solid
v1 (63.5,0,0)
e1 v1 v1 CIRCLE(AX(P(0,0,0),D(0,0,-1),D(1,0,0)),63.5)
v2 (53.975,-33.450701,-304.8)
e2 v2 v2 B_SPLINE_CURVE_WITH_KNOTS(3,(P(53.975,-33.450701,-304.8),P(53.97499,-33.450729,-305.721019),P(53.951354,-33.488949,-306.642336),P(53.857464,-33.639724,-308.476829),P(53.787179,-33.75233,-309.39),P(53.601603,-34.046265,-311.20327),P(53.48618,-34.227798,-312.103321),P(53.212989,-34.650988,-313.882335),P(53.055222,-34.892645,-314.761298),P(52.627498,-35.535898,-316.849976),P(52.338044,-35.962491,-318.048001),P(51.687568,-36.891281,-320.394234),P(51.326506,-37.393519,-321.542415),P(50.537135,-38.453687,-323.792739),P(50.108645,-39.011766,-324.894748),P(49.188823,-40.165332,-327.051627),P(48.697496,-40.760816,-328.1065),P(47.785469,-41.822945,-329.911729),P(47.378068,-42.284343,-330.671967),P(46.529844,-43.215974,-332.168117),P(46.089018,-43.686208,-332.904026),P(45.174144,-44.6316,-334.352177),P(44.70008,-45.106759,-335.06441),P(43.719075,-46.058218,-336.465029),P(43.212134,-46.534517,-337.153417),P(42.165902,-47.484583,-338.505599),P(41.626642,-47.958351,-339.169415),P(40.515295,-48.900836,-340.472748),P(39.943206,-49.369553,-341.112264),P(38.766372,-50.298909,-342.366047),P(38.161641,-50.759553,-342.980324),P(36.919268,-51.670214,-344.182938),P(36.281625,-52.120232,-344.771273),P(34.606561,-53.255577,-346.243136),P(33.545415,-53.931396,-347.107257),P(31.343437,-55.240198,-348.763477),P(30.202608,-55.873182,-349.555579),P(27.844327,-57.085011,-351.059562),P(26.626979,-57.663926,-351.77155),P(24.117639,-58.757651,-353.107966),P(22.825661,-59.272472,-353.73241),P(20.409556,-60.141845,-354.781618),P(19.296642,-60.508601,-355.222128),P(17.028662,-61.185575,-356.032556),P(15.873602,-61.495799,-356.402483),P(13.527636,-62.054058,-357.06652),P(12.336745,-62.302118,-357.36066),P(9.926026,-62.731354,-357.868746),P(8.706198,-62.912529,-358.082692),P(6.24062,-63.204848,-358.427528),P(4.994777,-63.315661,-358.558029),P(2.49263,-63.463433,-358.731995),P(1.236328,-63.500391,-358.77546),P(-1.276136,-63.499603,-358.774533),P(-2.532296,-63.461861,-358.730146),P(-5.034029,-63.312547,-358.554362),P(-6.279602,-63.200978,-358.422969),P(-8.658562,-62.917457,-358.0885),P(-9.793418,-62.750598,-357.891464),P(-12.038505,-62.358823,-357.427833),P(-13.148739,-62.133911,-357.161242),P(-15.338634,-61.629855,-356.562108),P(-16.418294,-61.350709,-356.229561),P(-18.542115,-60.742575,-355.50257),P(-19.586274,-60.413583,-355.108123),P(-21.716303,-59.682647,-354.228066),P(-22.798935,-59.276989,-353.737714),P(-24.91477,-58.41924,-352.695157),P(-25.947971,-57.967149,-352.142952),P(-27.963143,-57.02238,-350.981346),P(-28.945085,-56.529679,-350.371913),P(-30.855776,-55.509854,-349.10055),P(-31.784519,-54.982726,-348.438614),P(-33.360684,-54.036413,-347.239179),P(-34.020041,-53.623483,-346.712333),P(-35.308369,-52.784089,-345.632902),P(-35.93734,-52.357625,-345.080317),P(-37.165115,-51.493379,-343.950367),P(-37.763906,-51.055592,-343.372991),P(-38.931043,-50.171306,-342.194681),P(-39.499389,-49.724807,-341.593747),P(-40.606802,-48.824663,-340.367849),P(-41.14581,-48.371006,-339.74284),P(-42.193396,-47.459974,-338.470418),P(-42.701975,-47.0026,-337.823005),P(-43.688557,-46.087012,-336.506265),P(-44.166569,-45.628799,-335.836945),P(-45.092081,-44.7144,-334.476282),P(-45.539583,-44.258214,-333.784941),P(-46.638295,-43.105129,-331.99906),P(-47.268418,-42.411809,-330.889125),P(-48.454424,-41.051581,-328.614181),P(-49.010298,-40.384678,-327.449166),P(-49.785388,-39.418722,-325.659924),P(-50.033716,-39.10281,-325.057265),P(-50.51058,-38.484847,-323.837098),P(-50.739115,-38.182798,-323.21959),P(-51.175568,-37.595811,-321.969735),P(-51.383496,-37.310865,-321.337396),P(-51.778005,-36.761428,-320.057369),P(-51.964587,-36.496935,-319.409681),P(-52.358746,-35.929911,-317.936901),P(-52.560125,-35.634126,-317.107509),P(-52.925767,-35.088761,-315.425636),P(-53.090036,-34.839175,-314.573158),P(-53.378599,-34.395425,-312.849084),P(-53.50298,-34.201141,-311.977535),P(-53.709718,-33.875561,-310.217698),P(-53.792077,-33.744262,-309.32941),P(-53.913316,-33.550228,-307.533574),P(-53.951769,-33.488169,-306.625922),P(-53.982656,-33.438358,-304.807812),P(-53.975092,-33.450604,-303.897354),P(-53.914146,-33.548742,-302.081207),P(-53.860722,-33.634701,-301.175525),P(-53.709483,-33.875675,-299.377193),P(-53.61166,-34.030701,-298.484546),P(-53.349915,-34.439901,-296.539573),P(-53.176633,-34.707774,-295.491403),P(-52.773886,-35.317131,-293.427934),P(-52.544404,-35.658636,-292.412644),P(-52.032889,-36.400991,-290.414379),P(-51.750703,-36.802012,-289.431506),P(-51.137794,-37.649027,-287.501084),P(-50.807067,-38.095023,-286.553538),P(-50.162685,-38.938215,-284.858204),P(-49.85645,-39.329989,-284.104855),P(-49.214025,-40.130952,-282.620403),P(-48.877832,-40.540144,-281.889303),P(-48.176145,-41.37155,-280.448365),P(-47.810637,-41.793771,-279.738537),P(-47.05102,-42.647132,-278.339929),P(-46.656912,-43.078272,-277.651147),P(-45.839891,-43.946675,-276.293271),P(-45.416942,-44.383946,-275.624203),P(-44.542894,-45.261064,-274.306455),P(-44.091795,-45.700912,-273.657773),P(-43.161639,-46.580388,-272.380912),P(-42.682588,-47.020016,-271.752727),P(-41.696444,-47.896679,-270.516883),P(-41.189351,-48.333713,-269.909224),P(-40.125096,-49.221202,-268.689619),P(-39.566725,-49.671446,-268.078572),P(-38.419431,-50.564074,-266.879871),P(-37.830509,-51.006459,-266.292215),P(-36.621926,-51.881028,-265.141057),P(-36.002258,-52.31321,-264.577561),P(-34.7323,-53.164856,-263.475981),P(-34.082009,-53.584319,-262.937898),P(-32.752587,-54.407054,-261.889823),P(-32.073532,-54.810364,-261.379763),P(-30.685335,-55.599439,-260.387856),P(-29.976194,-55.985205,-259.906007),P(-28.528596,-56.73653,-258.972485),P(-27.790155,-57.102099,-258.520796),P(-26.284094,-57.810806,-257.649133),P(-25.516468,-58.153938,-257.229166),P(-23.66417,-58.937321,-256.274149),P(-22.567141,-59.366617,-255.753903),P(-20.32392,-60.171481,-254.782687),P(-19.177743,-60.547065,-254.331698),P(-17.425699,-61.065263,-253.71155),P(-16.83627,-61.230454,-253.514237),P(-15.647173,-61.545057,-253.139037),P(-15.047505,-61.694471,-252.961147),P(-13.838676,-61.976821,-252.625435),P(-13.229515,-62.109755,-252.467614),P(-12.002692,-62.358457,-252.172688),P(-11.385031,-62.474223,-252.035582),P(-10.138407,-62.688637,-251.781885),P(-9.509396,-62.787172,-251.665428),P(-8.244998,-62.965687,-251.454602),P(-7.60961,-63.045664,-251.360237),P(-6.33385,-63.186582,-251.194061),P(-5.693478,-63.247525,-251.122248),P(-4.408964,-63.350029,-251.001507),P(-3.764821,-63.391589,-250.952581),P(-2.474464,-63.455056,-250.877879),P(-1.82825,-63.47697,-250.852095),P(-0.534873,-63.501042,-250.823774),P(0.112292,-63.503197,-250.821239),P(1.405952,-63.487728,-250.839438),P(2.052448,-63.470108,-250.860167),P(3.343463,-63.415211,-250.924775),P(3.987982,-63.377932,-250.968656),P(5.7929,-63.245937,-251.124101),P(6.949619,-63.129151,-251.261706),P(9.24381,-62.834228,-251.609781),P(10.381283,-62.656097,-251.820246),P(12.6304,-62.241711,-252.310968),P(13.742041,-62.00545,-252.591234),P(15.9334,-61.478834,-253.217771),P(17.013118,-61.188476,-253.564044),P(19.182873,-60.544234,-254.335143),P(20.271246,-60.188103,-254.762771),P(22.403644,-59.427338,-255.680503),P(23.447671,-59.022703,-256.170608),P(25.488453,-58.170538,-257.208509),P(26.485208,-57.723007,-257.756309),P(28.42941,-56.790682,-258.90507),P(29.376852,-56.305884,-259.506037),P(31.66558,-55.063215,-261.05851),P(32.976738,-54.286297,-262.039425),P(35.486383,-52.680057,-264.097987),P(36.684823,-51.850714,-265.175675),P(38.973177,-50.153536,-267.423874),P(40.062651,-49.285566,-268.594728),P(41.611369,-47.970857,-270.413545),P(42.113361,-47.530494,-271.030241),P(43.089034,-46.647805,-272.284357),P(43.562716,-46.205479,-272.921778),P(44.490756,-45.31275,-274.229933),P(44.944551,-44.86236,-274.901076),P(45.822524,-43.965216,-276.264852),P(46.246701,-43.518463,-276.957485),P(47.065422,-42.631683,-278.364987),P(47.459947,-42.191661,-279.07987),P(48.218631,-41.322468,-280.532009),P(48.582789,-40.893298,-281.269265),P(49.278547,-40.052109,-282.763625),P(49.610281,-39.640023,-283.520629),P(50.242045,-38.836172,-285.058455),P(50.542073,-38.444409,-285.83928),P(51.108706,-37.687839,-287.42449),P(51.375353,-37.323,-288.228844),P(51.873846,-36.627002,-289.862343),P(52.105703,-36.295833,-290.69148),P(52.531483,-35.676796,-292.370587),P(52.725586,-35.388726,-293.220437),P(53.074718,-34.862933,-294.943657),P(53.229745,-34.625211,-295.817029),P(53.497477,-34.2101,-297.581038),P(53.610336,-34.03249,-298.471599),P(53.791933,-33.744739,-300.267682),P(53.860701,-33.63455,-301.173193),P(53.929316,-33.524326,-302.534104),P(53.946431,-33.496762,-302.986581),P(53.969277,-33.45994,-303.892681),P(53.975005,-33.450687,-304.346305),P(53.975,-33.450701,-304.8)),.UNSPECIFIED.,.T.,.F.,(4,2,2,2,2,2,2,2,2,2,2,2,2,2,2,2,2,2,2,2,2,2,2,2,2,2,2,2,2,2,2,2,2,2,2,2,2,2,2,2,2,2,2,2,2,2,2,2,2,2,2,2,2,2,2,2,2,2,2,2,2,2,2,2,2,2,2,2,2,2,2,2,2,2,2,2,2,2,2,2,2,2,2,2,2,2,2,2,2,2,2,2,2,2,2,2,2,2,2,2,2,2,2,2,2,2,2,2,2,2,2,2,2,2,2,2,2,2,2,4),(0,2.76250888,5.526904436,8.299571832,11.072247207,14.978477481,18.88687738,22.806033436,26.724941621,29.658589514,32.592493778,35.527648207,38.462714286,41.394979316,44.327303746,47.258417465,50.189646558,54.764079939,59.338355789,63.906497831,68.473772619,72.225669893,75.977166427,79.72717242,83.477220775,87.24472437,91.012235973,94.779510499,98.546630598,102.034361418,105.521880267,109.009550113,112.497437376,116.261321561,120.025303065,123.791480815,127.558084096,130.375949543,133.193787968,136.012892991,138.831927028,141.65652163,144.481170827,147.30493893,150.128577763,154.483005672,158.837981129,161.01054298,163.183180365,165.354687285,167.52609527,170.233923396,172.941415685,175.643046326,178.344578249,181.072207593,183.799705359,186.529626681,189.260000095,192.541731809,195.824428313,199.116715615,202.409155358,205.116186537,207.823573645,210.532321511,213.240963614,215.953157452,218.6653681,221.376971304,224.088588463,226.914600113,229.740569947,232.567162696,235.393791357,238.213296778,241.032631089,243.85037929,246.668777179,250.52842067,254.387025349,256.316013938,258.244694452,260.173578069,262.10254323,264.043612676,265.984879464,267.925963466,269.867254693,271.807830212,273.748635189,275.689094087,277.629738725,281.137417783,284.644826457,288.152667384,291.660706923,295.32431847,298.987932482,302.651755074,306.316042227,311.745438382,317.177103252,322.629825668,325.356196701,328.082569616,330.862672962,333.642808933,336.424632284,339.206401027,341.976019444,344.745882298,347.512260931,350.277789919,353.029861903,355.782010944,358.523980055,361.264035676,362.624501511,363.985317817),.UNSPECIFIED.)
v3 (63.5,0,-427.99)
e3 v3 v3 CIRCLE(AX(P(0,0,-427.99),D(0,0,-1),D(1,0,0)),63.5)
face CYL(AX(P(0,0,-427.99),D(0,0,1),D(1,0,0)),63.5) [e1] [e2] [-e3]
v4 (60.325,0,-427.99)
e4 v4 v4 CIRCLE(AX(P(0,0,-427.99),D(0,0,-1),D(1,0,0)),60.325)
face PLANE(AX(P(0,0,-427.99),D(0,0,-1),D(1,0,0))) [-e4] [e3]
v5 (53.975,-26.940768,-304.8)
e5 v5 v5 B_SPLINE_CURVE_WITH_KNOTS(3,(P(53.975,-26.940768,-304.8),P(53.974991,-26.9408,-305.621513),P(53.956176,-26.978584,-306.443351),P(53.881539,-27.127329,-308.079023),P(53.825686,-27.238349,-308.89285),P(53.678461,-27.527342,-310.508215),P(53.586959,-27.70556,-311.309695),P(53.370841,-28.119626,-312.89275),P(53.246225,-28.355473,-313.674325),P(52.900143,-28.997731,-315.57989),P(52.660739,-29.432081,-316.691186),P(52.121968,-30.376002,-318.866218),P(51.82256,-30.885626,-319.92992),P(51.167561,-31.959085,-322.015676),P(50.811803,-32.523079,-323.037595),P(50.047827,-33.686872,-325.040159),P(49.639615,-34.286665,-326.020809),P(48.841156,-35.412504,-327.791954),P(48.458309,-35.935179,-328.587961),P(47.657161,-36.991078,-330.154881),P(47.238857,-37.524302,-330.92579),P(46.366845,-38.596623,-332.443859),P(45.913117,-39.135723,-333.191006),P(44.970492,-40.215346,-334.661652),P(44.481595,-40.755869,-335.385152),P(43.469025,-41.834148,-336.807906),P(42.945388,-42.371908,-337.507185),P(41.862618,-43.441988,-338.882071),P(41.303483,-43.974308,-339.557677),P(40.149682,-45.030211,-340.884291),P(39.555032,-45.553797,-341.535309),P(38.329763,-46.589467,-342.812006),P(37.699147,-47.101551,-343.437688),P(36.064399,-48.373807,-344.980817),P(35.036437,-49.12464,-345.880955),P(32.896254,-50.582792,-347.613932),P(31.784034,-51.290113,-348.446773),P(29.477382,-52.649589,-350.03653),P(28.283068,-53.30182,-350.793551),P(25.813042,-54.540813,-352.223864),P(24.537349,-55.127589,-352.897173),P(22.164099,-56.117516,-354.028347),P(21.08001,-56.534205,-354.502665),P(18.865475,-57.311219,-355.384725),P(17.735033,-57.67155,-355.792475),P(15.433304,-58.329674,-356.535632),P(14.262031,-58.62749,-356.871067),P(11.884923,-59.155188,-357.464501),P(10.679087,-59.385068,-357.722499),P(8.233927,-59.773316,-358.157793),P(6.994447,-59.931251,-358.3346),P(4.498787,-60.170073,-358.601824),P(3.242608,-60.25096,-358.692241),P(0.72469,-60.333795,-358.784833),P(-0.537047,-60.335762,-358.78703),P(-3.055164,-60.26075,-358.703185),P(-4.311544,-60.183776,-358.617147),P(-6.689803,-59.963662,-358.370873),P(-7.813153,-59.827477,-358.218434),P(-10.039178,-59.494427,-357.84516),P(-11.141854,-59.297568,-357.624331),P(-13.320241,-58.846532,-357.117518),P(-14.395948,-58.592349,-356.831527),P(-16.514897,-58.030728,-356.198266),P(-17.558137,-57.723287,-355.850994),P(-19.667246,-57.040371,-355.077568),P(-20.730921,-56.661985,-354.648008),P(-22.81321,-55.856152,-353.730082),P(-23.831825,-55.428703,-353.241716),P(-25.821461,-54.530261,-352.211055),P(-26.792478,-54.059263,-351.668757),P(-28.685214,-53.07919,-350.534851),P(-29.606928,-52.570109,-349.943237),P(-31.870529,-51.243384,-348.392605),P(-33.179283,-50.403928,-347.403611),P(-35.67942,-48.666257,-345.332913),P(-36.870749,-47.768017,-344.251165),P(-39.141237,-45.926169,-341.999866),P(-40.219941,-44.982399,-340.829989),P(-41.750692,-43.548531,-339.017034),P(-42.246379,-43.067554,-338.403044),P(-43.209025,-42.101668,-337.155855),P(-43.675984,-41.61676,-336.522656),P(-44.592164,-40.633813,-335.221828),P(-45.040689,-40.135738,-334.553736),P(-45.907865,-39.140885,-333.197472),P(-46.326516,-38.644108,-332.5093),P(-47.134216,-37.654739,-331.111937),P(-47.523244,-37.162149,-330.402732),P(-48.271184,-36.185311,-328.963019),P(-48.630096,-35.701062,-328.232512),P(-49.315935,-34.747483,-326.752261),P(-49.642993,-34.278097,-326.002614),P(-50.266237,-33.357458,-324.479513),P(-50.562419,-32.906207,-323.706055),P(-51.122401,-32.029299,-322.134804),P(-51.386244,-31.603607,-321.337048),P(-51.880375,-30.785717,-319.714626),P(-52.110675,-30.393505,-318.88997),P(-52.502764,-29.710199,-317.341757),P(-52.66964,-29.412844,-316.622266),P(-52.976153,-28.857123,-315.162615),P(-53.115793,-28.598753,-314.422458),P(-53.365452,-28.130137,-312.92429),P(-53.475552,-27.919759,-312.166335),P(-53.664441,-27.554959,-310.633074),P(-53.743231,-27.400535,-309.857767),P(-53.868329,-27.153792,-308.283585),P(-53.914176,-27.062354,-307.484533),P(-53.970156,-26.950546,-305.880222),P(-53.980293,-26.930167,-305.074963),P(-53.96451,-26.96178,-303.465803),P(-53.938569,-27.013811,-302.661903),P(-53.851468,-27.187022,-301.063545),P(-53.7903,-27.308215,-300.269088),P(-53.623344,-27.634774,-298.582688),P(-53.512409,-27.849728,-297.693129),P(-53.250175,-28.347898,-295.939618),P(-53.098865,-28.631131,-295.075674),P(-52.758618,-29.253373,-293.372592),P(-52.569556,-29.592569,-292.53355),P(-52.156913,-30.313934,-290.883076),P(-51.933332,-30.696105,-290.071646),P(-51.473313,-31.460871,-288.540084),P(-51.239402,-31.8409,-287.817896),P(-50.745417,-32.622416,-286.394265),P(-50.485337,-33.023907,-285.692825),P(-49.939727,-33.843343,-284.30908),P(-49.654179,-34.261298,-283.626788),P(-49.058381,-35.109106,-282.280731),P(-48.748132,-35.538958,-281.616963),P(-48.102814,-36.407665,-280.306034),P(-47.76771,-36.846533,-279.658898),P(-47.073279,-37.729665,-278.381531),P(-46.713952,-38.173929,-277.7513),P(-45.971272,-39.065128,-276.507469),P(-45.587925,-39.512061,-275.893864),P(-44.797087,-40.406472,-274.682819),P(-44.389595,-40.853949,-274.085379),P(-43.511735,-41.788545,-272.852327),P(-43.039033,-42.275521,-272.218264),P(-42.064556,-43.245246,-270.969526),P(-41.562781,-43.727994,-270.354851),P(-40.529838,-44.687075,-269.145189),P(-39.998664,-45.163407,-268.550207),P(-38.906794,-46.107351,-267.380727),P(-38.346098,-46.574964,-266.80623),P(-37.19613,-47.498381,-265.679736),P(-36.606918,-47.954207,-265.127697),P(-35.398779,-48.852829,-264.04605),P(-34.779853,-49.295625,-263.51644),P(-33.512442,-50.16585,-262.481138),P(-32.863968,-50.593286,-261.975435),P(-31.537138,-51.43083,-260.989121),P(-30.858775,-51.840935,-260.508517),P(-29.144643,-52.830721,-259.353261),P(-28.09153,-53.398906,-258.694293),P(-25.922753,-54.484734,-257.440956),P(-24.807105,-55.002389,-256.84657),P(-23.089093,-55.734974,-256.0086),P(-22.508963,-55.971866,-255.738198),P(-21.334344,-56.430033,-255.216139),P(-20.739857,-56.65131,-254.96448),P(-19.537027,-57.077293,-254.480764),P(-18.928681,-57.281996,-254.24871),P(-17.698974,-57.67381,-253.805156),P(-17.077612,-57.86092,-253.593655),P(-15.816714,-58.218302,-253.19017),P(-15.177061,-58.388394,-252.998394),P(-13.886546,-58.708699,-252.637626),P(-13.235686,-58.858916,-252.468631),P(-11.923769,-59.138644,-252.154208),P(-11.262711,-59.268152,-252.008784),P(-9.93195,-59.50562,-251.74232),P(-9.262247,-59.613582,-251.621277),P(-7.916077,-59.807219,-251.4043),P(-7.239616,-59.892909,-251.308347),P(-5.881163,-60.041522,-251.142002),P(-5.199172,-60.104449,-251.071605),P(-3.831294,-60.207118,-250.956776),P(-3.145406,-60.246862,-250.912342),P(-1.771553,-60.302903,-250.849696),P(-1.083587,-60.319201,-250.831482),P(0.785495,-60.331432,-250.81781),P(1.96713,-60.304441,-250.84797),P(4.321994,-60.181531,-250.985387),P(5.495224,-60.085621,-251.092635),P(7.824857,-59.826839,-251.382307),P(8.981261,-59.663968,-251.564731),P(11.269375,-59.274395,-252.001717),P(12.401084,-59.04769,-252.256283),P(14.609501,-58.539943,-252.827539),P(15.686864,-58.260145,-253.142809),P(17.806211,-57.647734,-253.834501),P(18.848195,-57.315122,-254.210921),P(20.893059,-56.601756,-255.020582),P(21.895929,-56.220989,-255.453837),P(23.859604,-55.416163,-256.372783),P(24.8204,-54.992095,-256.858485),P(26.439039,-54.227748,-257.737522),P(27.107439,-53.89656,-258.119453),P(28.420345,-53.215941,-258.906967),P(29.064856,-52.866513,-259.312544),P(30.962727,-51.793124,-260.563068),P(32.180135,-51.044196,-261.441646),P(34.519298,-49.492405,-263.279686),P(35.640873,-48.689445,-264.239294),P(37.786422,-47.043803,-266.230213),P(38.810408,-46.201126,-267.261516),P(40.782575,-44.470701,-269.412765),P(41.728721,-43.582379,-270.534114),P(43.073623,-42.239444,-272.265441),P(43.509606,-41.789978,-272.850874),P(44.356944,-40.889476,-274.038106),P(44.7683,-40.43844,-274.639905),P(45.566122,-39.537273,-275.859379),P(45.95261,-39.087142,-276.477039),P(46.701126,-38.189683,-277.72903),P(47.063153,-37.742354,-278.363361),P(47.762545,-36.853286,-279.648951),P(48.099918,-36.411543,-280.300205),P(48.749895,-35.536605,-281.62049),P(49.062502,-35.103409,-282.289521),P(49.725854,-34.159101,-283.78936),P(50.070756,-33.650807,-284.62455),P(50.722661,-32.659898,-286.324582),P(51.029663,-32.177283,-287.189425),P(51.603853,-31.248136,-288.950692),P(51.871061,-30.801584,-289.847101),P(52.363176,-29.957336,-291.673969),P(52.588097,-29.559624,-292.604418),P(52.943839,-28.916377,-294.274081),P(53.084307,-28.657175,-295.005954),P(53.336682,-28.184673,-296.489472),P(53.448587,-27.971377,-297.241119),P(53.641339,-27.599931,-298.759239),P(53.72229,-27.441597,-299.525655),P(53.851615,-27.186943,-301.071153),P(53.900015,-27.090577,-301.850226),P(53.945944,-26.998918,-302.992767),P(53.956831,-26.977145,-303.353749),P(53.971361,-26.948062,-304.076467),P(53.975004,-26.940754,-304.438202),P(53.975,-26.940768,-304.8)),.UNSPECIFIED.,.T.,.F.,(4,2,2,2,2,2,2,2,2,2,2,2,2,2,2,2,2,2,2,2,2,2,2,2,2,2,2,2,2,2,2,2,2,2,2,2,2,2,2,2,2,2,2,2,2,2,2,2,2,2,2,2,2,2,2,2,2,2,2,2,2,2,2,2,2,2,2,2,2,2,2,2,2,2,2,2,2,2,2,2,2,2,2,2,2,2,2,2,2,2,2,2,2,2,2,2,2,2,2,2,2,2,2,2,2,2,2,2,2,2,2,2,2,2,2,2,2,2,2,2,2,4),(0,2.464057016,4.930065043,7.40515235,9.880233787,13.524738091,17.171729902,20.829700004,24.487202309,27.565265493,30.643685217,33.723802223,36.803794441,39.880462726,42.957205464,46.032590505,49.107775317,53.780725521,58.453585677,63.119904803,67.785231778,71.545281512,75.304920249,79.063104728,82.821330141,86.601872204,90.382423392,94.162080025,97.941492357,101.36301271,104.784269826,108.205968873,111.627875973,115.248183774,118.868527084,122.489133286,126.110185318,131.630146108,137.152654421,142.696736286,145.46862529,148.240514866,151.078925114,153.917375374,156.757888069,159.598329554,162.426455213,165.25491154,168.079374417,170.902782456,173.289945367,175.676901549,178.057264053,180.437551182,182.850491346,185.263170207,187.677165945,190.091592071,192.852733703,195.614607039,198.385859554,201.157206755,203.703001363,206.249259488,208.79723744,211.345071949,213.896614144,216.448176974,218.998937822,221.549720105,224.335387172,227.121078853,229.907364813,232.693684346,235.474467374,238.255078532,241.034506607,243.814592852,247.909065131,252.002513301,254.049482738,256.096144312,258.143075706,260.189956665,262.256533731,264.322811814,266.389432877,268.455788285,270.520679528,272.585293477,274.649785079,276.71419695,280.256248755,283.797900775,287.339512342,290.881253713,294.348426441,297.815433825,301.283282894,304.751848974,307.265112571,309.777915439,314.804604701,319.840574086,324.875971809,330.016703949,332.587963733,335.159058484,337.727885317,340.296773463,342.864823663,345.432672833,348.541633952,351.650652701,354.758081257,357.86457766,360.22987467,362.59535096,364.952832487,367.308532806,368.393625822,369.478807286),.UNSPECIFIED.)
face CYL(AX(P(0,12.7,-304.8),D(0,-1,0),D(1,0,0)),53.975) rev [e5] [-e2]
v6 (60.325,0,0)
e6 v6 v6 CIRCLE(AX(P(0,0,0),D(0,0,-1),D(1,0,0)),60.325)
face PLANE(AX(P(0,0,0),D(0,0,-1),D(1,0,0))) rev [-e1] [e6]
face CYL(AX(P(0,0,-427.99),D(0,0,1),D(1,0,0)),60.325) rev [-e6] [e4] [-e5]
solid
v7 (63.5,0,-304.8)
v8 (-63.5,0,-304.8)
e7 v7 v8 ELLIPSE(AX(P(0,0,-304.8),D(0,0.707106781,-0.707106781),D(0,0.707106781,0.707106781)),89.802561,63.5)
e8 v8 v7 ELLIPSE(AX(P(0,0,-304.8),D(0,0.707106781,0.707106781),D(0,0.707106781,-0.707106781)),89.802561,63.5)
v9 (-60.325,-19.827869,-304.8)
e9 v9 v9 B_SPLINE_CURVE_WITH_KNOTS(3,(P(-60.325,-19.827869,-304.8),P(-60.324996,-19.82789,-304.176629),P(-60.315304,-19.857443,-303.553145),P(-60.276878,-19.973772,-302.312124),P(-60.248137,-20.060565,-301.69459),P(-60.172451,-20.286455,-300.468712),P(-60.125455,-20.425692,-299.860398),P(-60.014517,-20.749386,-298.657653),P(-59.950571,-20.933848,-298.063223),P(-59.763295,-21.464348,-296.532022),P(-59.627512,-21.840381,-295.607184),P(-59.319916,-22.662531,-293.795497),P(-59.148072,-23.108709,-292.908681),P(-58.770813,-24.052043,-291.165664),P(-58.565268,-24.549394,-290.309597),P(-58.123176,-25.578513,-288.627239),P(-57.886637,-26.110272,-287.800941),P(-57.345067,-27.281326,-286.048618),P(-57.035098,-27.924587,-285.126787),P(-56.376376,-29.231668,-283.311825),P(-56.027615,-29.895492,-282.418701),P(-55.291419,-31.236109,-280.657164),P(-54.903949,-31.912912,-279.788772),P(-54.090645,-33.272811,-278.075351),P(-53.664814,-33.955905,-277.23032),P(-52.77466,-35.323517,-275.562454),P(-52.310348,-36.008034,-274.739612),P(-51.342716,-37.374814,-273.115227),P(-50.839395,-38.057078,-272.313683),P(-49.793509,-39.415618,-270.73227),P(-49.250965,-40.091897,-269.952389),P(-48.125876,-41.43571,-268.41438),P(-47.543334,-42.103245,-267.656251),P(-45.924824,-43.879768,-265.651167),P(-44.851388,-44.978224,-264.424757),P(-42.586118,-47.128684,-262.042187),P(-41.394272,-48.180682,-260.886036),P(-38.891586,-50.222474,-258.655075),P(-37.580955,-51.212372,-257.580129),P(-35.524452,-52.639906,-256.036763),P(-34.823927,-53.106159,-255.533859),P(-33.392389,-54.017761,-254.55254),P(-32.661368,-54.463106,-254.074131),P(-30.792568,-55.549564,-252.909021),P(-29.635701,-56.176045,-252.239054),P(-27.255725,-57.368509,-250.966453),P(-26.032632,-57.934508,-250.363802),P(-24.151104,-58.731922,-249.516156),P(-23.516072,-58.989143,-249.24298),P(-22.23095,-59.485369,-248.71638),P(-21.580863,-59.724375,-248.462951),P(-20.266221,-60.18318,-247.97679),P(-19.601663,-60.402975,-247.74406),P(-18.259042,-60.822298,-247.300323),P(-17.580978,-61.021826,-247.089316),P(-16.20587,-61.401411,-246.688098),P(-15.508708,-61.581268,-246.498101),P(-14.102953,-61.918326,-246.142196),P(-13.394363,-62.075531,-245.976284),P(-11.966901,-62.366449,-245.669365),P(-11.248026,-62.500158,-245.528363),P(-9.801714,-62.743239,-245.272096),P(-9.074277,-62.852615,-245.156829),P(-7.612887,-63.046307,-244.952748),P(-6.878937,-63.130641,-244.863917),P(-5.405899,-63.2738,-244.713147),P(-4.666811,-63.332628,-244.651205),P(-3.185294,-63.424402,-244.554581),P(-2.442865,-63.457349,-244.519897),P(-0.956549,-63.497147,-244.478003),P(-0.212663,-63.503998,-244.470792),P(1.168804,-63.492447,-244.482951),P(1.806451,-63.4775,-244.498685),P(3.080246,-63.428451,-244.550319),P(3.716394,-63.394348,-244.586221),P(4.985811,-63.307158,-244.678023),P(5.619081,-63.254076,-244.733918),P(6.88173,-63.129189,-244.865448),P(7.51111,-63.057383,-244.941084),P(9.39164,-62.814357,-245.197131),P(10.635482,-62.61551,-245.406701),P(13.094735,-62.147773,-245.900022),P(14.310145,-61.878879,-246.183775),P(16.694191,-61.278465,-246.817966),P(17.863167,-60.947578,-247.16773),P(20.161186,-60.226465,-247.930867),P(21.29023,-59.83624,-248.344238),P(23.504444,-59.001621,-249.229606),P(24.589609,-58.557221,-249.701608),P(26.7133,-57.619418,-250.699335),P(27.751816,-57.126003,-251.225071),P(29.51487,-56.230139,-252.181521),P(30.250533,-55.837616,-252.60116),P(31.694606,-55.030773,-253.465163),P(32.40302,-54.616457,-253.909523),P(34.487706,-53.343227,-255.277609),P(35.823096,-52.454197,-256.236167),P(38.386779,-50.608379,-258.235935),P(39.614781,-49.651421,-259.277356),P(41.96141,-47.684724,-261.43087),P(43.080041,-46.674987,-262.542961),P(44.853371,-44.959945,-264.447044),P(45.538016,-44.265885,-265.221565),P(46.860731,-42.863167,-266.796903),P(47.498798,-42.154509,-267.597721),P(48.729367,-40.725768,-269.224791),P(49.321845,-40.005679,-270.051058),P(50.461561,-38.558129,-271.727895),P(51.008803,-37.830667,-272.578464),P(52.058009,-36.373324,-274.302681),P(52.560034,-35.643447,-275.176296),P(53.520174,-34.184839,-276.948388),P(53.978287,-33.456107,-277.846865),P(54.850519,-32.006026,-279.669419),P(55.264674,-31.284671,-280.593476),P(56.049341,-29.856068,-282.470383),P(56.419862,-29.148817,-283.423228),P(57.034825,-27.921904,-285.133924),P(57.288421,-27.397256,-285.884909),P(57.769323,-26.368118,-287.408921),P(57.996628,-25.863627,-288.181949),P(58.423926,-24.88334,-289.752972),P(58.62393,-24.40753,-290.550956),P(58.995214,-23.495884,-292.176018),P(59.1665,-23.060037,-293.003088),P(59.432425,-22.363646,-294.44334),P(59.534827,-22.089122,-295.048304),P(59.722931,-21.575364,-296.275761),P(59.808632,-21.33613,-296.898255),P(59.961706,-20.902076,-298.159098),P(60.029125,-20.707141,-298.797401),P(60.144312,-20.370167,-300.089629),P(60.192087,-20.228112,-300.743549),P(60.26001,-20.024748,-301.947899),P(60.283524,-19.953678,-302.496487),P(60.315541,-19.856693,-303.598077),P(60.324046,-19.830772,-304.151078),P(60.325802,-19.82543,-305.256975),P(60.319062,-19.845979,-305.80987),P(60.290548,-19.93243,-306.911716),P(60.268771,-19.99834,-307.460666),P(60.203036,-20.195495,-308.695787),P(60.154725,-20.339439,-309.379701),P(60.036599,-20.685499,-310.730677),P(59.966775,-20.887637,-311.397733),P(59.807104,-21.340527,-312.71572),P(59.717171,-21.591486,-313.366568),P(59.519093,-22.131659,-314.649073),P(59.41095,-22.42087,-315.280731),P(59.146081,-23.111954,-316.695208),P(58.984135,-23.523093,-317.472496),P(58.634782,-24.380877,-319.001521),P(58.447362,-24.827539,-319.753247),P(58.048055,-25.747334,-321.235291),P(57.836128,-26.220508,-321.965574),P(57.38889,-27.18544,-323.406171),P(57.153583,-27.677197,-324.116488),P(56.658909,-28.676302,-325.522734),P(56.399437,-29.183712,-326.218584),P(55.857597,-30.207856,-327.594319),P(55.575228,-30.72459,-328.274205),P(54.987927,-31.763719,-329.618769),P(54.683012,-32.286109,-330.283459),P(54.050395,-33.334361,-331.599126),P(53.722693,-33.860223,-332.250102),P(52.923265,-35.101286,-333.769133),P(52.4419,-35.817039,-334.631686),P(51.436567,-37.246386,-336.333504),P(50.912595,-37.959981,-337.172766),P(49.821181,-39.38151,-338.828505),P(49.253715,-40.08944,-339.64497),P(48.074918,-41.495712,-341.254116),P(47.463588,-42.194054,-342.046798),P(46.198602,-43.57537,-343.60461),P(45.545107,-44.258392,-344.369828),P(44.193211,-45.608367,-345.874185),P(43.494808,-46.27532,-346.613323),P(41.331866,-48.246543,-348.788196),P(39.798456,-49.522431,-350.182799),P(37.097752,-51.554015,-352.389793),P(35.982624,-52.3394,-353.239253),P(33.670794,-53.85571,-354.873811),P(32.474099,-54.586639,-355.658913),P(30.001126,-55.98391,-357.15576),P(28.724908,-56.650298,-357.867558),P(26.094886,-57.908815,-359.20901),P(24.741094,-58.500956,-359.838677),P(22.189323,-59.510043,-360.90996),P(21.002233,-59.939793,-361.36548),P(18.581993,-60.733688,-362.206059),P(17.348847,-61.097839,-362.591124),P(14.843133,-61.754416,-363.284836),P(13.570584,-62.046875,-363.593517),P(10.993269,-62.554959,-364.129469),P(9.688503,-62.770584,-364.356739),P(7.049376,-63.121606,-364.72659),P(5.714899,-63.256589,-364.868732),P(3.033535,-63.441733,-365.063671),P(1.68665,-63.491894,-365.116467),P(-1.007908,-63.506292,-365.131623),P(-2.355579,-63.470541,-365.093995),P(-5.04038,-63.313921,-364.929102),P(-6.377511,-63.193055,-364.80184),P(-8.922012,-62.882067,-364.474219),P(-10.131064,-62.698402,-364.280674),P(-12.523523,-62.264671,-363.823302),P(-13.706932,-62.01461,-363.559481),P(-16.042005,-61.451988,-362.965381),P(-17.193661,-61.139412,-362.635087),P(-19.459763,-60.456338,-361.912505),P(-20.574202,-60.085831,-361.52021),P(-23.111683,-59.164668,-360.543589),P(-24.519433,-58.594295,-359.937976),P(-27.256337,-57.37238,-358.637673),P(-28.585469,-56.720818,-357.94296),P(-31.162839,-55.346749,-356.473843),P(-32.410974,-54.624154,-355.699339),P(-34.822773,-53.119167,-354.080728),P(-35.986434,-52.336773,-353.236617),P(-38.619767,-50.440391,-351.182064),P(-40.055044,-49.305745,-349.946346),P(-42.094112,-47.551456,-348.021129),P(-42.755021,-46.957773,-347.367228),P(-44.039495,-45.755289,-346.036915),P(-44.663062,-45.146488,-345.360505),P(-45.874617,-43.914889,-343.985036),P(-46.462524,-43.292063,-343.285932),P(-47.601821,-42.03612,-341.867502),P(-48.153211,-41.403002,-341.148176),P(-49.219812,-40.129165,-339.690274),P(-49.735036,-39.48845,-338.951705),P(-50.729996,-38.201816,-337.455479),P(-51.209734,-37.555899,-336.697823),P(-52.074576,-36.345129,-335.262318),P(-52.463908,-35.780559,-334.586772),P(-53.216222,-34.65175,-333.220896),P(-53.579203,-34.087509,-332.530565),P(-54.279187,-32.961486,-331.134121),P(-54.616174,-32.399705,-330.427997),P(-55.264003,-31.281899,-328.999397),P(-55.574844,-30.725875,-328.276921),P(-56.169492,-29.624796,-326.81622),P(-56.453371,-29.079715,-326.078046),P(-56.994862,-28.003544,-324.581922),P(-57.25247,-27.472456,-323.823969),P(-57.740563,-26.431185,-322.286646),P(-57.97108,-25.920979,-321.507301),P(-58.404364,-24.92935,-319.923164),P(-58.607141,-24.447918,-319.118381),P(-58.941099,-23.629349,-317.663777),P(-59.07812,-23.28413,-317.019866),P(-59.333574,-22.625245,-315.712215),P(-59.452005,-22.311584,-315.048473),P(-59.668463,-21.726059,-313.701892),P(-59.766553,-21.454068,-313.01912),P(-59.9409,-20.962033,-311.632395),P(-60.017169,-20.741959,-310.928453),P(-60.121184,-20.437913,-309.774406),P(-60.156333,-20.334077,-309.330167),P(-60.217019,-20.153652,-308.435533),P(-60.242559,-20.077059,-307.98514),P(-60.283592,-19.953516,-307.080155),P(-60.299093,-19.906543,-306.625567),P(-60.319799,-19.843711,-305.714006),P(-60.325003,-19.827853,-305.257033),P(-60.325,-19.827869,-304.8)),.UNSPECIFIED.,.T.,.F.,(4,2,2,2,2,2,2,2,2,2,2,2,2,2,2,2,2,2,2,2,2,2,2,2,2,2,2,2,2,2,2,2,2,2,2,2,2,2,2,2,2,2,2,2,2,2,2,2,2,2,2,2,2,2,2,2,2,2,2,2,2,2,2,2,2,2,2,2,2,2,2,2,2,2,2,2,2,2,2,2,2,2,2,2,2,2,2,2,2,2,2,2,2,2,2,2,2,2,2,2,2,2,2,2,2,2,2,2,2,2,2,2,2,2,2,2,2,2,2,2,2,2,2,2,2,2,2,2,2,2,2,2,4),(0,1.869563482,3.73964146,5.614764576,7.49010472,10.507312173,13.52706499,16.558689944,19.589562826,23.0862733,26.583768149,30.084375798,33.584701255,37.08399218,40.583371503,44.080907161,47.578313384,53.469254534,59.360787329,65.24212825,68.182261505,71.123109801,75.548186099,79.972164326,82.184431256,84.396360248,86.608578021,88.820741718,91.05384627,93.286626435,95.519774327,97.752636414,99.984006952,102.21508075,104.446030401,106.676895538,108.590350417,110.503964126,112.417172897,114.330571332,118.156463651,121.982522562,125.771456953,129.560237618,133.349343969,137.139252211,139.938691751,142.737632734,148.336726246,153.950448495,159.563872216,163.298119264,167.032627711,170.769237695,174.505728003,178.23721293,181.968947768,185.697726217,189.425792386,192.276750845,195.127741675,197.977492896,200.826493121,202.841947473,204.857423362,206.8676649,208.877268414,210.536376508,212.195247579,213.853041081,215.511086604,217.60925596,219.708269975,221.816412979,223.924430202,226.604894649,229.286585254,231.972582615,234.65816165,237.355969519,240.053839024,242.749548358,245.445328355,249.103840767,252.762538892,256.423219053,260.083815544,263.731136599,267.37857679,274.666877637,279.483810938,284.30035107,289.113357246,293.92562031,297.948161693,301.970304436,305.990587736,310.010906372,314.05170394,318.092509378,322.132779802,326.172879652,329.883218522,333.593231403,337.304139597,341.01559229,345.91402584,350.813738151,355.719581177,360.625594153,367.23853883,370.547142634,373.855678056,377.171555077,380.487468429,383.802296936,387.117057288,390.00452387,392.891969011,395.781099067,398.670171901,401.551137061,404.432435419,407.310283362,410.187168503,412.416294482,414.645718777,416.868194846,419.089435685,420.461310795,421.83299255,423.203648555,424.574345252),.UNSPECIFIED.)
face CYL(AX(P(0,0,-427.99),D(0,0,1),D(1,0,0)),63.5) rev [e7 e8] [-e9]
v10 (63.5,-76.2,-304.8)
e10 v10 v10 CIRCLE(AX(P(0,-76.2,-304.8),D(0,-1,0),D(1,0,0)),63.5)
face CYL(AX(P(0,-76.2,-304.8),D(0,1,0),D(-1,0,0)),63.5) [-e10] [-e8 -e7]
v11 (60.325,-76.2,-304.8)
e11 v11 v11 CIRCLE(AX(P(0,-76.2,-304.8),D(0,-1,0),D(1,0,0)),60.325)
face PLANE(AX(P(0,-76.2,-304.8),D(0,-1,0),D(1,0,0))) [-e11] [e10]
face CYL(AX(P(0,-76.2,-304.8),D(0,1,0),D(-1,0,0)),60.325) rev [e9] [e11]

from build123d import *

# Parameters (mm, degrees)
STRUCTURAL_START                 = -76.2
STRUCTURAL_MEMBER1_OUTLINE_R     = 63.5
STRUCTURAL_MEMBER1_OUTLINE_R_2   = 60.325
STRUCTURAL_MEMBER1_DEPTH         = 12.6999999
STRUCTURAL_START_2               = -63.5000001
STRUCTURAL_MEMBER1_2_OUTLINE_R   = 63.5
STRUCTURAL_MEMBER1_2_OUTLINE_R_2 = 60.325
STRUCTURAL_MEMBER1_2_DEPTH       = 63.5000002
STRUCTURAL_START_3               = -369
STRUCTURAL_MEMBER1_3_DEPTH       = 129
STRUCTURAL_START_4               = -427.99
STRUCTURAL_MEMBER1_4_OUTLINE_R   = 63.5
STRUCTURAL_MEMBER1_4_OUTLINE_R_2 = 60.325
STRUCTURAL_MEMBER1_4_DEPTH       = 427.99
SKETCH3_R                        = 53.975
CUT_EXTRUDE3_DEPTH               = 88.9


with BuildPart() as part:
    # Structural Member1: read off the stored shape, not the designer's step
    # Structural Member1 outline → Structural Member1 (new body)
    with BuildSketch(Plane(origin=(0, 0, 0), x_dir=(1, 0, 0), z_dir=(0, 1, 0)).offset(STRUCTURAL_START)):
        with Locations((0, 304.8)):
            Circle(STRUCTURAL_MEMBER1_OUTLINE_R)
        with Locations((0, 304.8)):
            Circle(STRUCTURAL_MEMBER1_OUTLINE_R_2, mode=Mode.SUBTRACT)
    extrude(amount=STRUCTURAL_MEMBER1_DEPTH)

    # Structural Member1 2 outline → Structural Member1 2 (add)
    with BuildSketch(Plane(origin=(0, 0, 0), x_dir=(1, 0, 0), z_dir=(0, 1, 0)).offset(STRUCTURAL_START_2)):
        with Locations((0, 304.8)):
            Circle(STRUCTURAL_MEMBER1_2_OUTLINE_R)
        with Locations((0, 304.8)):
            Circle(STRUCTURAL_MEMBER1_2_OUTLINE_R_2, mode=Mode.SUBTRACT)
    extrude(amount=STRUCTURAL_MEMBER1_2_DEPTH)

    # Structural Member1 3 outline → Structural Member1 3 (cut)
    with BuildSketch(Plane.XY.offset(STRUCTURAL_START_3)):
        with BuildLine():
            Line((63.5, 0), (-63.5, 0))
            ThreePointArc((-63.5, 0), (0, -63.5), (63.5, 0))
        make_face()
    extrude(amount=STRUCTURAL_MEMBER1_3_DEPTH, mode=Mode.SUBTRACT)


with BuildPart() as body_2:
    # Structural Member1 4 outline → Structural Member1 4 (new body)
    with BuildSketch(Plane.XY.offset(STRUCTURAL_START_4)):
        Circle(STRUCTURAL_MEMBER1_4_OUTLINE_R)
        Circle(STRUCTURAL_MEMBER1_4_OUTLINE_R_2, mode=Mode.SUBTRACT)
    extrude(amount=STRUCTURAL_MEMBER1_4_DEPTH)

    # Sketch3 → Cut-Extrude3 (cut)
    with BuildSketch(Plane.XZ.offset(76.2)):
        with Locations((0, -304.8)):
            Circle(SKETCH3_R)
    extrude(amount=-CUT_EXTRUDE3_DEPTH, mode=Mode.SUBTRACT)


solid = Compound([part.part, body_2.part])
